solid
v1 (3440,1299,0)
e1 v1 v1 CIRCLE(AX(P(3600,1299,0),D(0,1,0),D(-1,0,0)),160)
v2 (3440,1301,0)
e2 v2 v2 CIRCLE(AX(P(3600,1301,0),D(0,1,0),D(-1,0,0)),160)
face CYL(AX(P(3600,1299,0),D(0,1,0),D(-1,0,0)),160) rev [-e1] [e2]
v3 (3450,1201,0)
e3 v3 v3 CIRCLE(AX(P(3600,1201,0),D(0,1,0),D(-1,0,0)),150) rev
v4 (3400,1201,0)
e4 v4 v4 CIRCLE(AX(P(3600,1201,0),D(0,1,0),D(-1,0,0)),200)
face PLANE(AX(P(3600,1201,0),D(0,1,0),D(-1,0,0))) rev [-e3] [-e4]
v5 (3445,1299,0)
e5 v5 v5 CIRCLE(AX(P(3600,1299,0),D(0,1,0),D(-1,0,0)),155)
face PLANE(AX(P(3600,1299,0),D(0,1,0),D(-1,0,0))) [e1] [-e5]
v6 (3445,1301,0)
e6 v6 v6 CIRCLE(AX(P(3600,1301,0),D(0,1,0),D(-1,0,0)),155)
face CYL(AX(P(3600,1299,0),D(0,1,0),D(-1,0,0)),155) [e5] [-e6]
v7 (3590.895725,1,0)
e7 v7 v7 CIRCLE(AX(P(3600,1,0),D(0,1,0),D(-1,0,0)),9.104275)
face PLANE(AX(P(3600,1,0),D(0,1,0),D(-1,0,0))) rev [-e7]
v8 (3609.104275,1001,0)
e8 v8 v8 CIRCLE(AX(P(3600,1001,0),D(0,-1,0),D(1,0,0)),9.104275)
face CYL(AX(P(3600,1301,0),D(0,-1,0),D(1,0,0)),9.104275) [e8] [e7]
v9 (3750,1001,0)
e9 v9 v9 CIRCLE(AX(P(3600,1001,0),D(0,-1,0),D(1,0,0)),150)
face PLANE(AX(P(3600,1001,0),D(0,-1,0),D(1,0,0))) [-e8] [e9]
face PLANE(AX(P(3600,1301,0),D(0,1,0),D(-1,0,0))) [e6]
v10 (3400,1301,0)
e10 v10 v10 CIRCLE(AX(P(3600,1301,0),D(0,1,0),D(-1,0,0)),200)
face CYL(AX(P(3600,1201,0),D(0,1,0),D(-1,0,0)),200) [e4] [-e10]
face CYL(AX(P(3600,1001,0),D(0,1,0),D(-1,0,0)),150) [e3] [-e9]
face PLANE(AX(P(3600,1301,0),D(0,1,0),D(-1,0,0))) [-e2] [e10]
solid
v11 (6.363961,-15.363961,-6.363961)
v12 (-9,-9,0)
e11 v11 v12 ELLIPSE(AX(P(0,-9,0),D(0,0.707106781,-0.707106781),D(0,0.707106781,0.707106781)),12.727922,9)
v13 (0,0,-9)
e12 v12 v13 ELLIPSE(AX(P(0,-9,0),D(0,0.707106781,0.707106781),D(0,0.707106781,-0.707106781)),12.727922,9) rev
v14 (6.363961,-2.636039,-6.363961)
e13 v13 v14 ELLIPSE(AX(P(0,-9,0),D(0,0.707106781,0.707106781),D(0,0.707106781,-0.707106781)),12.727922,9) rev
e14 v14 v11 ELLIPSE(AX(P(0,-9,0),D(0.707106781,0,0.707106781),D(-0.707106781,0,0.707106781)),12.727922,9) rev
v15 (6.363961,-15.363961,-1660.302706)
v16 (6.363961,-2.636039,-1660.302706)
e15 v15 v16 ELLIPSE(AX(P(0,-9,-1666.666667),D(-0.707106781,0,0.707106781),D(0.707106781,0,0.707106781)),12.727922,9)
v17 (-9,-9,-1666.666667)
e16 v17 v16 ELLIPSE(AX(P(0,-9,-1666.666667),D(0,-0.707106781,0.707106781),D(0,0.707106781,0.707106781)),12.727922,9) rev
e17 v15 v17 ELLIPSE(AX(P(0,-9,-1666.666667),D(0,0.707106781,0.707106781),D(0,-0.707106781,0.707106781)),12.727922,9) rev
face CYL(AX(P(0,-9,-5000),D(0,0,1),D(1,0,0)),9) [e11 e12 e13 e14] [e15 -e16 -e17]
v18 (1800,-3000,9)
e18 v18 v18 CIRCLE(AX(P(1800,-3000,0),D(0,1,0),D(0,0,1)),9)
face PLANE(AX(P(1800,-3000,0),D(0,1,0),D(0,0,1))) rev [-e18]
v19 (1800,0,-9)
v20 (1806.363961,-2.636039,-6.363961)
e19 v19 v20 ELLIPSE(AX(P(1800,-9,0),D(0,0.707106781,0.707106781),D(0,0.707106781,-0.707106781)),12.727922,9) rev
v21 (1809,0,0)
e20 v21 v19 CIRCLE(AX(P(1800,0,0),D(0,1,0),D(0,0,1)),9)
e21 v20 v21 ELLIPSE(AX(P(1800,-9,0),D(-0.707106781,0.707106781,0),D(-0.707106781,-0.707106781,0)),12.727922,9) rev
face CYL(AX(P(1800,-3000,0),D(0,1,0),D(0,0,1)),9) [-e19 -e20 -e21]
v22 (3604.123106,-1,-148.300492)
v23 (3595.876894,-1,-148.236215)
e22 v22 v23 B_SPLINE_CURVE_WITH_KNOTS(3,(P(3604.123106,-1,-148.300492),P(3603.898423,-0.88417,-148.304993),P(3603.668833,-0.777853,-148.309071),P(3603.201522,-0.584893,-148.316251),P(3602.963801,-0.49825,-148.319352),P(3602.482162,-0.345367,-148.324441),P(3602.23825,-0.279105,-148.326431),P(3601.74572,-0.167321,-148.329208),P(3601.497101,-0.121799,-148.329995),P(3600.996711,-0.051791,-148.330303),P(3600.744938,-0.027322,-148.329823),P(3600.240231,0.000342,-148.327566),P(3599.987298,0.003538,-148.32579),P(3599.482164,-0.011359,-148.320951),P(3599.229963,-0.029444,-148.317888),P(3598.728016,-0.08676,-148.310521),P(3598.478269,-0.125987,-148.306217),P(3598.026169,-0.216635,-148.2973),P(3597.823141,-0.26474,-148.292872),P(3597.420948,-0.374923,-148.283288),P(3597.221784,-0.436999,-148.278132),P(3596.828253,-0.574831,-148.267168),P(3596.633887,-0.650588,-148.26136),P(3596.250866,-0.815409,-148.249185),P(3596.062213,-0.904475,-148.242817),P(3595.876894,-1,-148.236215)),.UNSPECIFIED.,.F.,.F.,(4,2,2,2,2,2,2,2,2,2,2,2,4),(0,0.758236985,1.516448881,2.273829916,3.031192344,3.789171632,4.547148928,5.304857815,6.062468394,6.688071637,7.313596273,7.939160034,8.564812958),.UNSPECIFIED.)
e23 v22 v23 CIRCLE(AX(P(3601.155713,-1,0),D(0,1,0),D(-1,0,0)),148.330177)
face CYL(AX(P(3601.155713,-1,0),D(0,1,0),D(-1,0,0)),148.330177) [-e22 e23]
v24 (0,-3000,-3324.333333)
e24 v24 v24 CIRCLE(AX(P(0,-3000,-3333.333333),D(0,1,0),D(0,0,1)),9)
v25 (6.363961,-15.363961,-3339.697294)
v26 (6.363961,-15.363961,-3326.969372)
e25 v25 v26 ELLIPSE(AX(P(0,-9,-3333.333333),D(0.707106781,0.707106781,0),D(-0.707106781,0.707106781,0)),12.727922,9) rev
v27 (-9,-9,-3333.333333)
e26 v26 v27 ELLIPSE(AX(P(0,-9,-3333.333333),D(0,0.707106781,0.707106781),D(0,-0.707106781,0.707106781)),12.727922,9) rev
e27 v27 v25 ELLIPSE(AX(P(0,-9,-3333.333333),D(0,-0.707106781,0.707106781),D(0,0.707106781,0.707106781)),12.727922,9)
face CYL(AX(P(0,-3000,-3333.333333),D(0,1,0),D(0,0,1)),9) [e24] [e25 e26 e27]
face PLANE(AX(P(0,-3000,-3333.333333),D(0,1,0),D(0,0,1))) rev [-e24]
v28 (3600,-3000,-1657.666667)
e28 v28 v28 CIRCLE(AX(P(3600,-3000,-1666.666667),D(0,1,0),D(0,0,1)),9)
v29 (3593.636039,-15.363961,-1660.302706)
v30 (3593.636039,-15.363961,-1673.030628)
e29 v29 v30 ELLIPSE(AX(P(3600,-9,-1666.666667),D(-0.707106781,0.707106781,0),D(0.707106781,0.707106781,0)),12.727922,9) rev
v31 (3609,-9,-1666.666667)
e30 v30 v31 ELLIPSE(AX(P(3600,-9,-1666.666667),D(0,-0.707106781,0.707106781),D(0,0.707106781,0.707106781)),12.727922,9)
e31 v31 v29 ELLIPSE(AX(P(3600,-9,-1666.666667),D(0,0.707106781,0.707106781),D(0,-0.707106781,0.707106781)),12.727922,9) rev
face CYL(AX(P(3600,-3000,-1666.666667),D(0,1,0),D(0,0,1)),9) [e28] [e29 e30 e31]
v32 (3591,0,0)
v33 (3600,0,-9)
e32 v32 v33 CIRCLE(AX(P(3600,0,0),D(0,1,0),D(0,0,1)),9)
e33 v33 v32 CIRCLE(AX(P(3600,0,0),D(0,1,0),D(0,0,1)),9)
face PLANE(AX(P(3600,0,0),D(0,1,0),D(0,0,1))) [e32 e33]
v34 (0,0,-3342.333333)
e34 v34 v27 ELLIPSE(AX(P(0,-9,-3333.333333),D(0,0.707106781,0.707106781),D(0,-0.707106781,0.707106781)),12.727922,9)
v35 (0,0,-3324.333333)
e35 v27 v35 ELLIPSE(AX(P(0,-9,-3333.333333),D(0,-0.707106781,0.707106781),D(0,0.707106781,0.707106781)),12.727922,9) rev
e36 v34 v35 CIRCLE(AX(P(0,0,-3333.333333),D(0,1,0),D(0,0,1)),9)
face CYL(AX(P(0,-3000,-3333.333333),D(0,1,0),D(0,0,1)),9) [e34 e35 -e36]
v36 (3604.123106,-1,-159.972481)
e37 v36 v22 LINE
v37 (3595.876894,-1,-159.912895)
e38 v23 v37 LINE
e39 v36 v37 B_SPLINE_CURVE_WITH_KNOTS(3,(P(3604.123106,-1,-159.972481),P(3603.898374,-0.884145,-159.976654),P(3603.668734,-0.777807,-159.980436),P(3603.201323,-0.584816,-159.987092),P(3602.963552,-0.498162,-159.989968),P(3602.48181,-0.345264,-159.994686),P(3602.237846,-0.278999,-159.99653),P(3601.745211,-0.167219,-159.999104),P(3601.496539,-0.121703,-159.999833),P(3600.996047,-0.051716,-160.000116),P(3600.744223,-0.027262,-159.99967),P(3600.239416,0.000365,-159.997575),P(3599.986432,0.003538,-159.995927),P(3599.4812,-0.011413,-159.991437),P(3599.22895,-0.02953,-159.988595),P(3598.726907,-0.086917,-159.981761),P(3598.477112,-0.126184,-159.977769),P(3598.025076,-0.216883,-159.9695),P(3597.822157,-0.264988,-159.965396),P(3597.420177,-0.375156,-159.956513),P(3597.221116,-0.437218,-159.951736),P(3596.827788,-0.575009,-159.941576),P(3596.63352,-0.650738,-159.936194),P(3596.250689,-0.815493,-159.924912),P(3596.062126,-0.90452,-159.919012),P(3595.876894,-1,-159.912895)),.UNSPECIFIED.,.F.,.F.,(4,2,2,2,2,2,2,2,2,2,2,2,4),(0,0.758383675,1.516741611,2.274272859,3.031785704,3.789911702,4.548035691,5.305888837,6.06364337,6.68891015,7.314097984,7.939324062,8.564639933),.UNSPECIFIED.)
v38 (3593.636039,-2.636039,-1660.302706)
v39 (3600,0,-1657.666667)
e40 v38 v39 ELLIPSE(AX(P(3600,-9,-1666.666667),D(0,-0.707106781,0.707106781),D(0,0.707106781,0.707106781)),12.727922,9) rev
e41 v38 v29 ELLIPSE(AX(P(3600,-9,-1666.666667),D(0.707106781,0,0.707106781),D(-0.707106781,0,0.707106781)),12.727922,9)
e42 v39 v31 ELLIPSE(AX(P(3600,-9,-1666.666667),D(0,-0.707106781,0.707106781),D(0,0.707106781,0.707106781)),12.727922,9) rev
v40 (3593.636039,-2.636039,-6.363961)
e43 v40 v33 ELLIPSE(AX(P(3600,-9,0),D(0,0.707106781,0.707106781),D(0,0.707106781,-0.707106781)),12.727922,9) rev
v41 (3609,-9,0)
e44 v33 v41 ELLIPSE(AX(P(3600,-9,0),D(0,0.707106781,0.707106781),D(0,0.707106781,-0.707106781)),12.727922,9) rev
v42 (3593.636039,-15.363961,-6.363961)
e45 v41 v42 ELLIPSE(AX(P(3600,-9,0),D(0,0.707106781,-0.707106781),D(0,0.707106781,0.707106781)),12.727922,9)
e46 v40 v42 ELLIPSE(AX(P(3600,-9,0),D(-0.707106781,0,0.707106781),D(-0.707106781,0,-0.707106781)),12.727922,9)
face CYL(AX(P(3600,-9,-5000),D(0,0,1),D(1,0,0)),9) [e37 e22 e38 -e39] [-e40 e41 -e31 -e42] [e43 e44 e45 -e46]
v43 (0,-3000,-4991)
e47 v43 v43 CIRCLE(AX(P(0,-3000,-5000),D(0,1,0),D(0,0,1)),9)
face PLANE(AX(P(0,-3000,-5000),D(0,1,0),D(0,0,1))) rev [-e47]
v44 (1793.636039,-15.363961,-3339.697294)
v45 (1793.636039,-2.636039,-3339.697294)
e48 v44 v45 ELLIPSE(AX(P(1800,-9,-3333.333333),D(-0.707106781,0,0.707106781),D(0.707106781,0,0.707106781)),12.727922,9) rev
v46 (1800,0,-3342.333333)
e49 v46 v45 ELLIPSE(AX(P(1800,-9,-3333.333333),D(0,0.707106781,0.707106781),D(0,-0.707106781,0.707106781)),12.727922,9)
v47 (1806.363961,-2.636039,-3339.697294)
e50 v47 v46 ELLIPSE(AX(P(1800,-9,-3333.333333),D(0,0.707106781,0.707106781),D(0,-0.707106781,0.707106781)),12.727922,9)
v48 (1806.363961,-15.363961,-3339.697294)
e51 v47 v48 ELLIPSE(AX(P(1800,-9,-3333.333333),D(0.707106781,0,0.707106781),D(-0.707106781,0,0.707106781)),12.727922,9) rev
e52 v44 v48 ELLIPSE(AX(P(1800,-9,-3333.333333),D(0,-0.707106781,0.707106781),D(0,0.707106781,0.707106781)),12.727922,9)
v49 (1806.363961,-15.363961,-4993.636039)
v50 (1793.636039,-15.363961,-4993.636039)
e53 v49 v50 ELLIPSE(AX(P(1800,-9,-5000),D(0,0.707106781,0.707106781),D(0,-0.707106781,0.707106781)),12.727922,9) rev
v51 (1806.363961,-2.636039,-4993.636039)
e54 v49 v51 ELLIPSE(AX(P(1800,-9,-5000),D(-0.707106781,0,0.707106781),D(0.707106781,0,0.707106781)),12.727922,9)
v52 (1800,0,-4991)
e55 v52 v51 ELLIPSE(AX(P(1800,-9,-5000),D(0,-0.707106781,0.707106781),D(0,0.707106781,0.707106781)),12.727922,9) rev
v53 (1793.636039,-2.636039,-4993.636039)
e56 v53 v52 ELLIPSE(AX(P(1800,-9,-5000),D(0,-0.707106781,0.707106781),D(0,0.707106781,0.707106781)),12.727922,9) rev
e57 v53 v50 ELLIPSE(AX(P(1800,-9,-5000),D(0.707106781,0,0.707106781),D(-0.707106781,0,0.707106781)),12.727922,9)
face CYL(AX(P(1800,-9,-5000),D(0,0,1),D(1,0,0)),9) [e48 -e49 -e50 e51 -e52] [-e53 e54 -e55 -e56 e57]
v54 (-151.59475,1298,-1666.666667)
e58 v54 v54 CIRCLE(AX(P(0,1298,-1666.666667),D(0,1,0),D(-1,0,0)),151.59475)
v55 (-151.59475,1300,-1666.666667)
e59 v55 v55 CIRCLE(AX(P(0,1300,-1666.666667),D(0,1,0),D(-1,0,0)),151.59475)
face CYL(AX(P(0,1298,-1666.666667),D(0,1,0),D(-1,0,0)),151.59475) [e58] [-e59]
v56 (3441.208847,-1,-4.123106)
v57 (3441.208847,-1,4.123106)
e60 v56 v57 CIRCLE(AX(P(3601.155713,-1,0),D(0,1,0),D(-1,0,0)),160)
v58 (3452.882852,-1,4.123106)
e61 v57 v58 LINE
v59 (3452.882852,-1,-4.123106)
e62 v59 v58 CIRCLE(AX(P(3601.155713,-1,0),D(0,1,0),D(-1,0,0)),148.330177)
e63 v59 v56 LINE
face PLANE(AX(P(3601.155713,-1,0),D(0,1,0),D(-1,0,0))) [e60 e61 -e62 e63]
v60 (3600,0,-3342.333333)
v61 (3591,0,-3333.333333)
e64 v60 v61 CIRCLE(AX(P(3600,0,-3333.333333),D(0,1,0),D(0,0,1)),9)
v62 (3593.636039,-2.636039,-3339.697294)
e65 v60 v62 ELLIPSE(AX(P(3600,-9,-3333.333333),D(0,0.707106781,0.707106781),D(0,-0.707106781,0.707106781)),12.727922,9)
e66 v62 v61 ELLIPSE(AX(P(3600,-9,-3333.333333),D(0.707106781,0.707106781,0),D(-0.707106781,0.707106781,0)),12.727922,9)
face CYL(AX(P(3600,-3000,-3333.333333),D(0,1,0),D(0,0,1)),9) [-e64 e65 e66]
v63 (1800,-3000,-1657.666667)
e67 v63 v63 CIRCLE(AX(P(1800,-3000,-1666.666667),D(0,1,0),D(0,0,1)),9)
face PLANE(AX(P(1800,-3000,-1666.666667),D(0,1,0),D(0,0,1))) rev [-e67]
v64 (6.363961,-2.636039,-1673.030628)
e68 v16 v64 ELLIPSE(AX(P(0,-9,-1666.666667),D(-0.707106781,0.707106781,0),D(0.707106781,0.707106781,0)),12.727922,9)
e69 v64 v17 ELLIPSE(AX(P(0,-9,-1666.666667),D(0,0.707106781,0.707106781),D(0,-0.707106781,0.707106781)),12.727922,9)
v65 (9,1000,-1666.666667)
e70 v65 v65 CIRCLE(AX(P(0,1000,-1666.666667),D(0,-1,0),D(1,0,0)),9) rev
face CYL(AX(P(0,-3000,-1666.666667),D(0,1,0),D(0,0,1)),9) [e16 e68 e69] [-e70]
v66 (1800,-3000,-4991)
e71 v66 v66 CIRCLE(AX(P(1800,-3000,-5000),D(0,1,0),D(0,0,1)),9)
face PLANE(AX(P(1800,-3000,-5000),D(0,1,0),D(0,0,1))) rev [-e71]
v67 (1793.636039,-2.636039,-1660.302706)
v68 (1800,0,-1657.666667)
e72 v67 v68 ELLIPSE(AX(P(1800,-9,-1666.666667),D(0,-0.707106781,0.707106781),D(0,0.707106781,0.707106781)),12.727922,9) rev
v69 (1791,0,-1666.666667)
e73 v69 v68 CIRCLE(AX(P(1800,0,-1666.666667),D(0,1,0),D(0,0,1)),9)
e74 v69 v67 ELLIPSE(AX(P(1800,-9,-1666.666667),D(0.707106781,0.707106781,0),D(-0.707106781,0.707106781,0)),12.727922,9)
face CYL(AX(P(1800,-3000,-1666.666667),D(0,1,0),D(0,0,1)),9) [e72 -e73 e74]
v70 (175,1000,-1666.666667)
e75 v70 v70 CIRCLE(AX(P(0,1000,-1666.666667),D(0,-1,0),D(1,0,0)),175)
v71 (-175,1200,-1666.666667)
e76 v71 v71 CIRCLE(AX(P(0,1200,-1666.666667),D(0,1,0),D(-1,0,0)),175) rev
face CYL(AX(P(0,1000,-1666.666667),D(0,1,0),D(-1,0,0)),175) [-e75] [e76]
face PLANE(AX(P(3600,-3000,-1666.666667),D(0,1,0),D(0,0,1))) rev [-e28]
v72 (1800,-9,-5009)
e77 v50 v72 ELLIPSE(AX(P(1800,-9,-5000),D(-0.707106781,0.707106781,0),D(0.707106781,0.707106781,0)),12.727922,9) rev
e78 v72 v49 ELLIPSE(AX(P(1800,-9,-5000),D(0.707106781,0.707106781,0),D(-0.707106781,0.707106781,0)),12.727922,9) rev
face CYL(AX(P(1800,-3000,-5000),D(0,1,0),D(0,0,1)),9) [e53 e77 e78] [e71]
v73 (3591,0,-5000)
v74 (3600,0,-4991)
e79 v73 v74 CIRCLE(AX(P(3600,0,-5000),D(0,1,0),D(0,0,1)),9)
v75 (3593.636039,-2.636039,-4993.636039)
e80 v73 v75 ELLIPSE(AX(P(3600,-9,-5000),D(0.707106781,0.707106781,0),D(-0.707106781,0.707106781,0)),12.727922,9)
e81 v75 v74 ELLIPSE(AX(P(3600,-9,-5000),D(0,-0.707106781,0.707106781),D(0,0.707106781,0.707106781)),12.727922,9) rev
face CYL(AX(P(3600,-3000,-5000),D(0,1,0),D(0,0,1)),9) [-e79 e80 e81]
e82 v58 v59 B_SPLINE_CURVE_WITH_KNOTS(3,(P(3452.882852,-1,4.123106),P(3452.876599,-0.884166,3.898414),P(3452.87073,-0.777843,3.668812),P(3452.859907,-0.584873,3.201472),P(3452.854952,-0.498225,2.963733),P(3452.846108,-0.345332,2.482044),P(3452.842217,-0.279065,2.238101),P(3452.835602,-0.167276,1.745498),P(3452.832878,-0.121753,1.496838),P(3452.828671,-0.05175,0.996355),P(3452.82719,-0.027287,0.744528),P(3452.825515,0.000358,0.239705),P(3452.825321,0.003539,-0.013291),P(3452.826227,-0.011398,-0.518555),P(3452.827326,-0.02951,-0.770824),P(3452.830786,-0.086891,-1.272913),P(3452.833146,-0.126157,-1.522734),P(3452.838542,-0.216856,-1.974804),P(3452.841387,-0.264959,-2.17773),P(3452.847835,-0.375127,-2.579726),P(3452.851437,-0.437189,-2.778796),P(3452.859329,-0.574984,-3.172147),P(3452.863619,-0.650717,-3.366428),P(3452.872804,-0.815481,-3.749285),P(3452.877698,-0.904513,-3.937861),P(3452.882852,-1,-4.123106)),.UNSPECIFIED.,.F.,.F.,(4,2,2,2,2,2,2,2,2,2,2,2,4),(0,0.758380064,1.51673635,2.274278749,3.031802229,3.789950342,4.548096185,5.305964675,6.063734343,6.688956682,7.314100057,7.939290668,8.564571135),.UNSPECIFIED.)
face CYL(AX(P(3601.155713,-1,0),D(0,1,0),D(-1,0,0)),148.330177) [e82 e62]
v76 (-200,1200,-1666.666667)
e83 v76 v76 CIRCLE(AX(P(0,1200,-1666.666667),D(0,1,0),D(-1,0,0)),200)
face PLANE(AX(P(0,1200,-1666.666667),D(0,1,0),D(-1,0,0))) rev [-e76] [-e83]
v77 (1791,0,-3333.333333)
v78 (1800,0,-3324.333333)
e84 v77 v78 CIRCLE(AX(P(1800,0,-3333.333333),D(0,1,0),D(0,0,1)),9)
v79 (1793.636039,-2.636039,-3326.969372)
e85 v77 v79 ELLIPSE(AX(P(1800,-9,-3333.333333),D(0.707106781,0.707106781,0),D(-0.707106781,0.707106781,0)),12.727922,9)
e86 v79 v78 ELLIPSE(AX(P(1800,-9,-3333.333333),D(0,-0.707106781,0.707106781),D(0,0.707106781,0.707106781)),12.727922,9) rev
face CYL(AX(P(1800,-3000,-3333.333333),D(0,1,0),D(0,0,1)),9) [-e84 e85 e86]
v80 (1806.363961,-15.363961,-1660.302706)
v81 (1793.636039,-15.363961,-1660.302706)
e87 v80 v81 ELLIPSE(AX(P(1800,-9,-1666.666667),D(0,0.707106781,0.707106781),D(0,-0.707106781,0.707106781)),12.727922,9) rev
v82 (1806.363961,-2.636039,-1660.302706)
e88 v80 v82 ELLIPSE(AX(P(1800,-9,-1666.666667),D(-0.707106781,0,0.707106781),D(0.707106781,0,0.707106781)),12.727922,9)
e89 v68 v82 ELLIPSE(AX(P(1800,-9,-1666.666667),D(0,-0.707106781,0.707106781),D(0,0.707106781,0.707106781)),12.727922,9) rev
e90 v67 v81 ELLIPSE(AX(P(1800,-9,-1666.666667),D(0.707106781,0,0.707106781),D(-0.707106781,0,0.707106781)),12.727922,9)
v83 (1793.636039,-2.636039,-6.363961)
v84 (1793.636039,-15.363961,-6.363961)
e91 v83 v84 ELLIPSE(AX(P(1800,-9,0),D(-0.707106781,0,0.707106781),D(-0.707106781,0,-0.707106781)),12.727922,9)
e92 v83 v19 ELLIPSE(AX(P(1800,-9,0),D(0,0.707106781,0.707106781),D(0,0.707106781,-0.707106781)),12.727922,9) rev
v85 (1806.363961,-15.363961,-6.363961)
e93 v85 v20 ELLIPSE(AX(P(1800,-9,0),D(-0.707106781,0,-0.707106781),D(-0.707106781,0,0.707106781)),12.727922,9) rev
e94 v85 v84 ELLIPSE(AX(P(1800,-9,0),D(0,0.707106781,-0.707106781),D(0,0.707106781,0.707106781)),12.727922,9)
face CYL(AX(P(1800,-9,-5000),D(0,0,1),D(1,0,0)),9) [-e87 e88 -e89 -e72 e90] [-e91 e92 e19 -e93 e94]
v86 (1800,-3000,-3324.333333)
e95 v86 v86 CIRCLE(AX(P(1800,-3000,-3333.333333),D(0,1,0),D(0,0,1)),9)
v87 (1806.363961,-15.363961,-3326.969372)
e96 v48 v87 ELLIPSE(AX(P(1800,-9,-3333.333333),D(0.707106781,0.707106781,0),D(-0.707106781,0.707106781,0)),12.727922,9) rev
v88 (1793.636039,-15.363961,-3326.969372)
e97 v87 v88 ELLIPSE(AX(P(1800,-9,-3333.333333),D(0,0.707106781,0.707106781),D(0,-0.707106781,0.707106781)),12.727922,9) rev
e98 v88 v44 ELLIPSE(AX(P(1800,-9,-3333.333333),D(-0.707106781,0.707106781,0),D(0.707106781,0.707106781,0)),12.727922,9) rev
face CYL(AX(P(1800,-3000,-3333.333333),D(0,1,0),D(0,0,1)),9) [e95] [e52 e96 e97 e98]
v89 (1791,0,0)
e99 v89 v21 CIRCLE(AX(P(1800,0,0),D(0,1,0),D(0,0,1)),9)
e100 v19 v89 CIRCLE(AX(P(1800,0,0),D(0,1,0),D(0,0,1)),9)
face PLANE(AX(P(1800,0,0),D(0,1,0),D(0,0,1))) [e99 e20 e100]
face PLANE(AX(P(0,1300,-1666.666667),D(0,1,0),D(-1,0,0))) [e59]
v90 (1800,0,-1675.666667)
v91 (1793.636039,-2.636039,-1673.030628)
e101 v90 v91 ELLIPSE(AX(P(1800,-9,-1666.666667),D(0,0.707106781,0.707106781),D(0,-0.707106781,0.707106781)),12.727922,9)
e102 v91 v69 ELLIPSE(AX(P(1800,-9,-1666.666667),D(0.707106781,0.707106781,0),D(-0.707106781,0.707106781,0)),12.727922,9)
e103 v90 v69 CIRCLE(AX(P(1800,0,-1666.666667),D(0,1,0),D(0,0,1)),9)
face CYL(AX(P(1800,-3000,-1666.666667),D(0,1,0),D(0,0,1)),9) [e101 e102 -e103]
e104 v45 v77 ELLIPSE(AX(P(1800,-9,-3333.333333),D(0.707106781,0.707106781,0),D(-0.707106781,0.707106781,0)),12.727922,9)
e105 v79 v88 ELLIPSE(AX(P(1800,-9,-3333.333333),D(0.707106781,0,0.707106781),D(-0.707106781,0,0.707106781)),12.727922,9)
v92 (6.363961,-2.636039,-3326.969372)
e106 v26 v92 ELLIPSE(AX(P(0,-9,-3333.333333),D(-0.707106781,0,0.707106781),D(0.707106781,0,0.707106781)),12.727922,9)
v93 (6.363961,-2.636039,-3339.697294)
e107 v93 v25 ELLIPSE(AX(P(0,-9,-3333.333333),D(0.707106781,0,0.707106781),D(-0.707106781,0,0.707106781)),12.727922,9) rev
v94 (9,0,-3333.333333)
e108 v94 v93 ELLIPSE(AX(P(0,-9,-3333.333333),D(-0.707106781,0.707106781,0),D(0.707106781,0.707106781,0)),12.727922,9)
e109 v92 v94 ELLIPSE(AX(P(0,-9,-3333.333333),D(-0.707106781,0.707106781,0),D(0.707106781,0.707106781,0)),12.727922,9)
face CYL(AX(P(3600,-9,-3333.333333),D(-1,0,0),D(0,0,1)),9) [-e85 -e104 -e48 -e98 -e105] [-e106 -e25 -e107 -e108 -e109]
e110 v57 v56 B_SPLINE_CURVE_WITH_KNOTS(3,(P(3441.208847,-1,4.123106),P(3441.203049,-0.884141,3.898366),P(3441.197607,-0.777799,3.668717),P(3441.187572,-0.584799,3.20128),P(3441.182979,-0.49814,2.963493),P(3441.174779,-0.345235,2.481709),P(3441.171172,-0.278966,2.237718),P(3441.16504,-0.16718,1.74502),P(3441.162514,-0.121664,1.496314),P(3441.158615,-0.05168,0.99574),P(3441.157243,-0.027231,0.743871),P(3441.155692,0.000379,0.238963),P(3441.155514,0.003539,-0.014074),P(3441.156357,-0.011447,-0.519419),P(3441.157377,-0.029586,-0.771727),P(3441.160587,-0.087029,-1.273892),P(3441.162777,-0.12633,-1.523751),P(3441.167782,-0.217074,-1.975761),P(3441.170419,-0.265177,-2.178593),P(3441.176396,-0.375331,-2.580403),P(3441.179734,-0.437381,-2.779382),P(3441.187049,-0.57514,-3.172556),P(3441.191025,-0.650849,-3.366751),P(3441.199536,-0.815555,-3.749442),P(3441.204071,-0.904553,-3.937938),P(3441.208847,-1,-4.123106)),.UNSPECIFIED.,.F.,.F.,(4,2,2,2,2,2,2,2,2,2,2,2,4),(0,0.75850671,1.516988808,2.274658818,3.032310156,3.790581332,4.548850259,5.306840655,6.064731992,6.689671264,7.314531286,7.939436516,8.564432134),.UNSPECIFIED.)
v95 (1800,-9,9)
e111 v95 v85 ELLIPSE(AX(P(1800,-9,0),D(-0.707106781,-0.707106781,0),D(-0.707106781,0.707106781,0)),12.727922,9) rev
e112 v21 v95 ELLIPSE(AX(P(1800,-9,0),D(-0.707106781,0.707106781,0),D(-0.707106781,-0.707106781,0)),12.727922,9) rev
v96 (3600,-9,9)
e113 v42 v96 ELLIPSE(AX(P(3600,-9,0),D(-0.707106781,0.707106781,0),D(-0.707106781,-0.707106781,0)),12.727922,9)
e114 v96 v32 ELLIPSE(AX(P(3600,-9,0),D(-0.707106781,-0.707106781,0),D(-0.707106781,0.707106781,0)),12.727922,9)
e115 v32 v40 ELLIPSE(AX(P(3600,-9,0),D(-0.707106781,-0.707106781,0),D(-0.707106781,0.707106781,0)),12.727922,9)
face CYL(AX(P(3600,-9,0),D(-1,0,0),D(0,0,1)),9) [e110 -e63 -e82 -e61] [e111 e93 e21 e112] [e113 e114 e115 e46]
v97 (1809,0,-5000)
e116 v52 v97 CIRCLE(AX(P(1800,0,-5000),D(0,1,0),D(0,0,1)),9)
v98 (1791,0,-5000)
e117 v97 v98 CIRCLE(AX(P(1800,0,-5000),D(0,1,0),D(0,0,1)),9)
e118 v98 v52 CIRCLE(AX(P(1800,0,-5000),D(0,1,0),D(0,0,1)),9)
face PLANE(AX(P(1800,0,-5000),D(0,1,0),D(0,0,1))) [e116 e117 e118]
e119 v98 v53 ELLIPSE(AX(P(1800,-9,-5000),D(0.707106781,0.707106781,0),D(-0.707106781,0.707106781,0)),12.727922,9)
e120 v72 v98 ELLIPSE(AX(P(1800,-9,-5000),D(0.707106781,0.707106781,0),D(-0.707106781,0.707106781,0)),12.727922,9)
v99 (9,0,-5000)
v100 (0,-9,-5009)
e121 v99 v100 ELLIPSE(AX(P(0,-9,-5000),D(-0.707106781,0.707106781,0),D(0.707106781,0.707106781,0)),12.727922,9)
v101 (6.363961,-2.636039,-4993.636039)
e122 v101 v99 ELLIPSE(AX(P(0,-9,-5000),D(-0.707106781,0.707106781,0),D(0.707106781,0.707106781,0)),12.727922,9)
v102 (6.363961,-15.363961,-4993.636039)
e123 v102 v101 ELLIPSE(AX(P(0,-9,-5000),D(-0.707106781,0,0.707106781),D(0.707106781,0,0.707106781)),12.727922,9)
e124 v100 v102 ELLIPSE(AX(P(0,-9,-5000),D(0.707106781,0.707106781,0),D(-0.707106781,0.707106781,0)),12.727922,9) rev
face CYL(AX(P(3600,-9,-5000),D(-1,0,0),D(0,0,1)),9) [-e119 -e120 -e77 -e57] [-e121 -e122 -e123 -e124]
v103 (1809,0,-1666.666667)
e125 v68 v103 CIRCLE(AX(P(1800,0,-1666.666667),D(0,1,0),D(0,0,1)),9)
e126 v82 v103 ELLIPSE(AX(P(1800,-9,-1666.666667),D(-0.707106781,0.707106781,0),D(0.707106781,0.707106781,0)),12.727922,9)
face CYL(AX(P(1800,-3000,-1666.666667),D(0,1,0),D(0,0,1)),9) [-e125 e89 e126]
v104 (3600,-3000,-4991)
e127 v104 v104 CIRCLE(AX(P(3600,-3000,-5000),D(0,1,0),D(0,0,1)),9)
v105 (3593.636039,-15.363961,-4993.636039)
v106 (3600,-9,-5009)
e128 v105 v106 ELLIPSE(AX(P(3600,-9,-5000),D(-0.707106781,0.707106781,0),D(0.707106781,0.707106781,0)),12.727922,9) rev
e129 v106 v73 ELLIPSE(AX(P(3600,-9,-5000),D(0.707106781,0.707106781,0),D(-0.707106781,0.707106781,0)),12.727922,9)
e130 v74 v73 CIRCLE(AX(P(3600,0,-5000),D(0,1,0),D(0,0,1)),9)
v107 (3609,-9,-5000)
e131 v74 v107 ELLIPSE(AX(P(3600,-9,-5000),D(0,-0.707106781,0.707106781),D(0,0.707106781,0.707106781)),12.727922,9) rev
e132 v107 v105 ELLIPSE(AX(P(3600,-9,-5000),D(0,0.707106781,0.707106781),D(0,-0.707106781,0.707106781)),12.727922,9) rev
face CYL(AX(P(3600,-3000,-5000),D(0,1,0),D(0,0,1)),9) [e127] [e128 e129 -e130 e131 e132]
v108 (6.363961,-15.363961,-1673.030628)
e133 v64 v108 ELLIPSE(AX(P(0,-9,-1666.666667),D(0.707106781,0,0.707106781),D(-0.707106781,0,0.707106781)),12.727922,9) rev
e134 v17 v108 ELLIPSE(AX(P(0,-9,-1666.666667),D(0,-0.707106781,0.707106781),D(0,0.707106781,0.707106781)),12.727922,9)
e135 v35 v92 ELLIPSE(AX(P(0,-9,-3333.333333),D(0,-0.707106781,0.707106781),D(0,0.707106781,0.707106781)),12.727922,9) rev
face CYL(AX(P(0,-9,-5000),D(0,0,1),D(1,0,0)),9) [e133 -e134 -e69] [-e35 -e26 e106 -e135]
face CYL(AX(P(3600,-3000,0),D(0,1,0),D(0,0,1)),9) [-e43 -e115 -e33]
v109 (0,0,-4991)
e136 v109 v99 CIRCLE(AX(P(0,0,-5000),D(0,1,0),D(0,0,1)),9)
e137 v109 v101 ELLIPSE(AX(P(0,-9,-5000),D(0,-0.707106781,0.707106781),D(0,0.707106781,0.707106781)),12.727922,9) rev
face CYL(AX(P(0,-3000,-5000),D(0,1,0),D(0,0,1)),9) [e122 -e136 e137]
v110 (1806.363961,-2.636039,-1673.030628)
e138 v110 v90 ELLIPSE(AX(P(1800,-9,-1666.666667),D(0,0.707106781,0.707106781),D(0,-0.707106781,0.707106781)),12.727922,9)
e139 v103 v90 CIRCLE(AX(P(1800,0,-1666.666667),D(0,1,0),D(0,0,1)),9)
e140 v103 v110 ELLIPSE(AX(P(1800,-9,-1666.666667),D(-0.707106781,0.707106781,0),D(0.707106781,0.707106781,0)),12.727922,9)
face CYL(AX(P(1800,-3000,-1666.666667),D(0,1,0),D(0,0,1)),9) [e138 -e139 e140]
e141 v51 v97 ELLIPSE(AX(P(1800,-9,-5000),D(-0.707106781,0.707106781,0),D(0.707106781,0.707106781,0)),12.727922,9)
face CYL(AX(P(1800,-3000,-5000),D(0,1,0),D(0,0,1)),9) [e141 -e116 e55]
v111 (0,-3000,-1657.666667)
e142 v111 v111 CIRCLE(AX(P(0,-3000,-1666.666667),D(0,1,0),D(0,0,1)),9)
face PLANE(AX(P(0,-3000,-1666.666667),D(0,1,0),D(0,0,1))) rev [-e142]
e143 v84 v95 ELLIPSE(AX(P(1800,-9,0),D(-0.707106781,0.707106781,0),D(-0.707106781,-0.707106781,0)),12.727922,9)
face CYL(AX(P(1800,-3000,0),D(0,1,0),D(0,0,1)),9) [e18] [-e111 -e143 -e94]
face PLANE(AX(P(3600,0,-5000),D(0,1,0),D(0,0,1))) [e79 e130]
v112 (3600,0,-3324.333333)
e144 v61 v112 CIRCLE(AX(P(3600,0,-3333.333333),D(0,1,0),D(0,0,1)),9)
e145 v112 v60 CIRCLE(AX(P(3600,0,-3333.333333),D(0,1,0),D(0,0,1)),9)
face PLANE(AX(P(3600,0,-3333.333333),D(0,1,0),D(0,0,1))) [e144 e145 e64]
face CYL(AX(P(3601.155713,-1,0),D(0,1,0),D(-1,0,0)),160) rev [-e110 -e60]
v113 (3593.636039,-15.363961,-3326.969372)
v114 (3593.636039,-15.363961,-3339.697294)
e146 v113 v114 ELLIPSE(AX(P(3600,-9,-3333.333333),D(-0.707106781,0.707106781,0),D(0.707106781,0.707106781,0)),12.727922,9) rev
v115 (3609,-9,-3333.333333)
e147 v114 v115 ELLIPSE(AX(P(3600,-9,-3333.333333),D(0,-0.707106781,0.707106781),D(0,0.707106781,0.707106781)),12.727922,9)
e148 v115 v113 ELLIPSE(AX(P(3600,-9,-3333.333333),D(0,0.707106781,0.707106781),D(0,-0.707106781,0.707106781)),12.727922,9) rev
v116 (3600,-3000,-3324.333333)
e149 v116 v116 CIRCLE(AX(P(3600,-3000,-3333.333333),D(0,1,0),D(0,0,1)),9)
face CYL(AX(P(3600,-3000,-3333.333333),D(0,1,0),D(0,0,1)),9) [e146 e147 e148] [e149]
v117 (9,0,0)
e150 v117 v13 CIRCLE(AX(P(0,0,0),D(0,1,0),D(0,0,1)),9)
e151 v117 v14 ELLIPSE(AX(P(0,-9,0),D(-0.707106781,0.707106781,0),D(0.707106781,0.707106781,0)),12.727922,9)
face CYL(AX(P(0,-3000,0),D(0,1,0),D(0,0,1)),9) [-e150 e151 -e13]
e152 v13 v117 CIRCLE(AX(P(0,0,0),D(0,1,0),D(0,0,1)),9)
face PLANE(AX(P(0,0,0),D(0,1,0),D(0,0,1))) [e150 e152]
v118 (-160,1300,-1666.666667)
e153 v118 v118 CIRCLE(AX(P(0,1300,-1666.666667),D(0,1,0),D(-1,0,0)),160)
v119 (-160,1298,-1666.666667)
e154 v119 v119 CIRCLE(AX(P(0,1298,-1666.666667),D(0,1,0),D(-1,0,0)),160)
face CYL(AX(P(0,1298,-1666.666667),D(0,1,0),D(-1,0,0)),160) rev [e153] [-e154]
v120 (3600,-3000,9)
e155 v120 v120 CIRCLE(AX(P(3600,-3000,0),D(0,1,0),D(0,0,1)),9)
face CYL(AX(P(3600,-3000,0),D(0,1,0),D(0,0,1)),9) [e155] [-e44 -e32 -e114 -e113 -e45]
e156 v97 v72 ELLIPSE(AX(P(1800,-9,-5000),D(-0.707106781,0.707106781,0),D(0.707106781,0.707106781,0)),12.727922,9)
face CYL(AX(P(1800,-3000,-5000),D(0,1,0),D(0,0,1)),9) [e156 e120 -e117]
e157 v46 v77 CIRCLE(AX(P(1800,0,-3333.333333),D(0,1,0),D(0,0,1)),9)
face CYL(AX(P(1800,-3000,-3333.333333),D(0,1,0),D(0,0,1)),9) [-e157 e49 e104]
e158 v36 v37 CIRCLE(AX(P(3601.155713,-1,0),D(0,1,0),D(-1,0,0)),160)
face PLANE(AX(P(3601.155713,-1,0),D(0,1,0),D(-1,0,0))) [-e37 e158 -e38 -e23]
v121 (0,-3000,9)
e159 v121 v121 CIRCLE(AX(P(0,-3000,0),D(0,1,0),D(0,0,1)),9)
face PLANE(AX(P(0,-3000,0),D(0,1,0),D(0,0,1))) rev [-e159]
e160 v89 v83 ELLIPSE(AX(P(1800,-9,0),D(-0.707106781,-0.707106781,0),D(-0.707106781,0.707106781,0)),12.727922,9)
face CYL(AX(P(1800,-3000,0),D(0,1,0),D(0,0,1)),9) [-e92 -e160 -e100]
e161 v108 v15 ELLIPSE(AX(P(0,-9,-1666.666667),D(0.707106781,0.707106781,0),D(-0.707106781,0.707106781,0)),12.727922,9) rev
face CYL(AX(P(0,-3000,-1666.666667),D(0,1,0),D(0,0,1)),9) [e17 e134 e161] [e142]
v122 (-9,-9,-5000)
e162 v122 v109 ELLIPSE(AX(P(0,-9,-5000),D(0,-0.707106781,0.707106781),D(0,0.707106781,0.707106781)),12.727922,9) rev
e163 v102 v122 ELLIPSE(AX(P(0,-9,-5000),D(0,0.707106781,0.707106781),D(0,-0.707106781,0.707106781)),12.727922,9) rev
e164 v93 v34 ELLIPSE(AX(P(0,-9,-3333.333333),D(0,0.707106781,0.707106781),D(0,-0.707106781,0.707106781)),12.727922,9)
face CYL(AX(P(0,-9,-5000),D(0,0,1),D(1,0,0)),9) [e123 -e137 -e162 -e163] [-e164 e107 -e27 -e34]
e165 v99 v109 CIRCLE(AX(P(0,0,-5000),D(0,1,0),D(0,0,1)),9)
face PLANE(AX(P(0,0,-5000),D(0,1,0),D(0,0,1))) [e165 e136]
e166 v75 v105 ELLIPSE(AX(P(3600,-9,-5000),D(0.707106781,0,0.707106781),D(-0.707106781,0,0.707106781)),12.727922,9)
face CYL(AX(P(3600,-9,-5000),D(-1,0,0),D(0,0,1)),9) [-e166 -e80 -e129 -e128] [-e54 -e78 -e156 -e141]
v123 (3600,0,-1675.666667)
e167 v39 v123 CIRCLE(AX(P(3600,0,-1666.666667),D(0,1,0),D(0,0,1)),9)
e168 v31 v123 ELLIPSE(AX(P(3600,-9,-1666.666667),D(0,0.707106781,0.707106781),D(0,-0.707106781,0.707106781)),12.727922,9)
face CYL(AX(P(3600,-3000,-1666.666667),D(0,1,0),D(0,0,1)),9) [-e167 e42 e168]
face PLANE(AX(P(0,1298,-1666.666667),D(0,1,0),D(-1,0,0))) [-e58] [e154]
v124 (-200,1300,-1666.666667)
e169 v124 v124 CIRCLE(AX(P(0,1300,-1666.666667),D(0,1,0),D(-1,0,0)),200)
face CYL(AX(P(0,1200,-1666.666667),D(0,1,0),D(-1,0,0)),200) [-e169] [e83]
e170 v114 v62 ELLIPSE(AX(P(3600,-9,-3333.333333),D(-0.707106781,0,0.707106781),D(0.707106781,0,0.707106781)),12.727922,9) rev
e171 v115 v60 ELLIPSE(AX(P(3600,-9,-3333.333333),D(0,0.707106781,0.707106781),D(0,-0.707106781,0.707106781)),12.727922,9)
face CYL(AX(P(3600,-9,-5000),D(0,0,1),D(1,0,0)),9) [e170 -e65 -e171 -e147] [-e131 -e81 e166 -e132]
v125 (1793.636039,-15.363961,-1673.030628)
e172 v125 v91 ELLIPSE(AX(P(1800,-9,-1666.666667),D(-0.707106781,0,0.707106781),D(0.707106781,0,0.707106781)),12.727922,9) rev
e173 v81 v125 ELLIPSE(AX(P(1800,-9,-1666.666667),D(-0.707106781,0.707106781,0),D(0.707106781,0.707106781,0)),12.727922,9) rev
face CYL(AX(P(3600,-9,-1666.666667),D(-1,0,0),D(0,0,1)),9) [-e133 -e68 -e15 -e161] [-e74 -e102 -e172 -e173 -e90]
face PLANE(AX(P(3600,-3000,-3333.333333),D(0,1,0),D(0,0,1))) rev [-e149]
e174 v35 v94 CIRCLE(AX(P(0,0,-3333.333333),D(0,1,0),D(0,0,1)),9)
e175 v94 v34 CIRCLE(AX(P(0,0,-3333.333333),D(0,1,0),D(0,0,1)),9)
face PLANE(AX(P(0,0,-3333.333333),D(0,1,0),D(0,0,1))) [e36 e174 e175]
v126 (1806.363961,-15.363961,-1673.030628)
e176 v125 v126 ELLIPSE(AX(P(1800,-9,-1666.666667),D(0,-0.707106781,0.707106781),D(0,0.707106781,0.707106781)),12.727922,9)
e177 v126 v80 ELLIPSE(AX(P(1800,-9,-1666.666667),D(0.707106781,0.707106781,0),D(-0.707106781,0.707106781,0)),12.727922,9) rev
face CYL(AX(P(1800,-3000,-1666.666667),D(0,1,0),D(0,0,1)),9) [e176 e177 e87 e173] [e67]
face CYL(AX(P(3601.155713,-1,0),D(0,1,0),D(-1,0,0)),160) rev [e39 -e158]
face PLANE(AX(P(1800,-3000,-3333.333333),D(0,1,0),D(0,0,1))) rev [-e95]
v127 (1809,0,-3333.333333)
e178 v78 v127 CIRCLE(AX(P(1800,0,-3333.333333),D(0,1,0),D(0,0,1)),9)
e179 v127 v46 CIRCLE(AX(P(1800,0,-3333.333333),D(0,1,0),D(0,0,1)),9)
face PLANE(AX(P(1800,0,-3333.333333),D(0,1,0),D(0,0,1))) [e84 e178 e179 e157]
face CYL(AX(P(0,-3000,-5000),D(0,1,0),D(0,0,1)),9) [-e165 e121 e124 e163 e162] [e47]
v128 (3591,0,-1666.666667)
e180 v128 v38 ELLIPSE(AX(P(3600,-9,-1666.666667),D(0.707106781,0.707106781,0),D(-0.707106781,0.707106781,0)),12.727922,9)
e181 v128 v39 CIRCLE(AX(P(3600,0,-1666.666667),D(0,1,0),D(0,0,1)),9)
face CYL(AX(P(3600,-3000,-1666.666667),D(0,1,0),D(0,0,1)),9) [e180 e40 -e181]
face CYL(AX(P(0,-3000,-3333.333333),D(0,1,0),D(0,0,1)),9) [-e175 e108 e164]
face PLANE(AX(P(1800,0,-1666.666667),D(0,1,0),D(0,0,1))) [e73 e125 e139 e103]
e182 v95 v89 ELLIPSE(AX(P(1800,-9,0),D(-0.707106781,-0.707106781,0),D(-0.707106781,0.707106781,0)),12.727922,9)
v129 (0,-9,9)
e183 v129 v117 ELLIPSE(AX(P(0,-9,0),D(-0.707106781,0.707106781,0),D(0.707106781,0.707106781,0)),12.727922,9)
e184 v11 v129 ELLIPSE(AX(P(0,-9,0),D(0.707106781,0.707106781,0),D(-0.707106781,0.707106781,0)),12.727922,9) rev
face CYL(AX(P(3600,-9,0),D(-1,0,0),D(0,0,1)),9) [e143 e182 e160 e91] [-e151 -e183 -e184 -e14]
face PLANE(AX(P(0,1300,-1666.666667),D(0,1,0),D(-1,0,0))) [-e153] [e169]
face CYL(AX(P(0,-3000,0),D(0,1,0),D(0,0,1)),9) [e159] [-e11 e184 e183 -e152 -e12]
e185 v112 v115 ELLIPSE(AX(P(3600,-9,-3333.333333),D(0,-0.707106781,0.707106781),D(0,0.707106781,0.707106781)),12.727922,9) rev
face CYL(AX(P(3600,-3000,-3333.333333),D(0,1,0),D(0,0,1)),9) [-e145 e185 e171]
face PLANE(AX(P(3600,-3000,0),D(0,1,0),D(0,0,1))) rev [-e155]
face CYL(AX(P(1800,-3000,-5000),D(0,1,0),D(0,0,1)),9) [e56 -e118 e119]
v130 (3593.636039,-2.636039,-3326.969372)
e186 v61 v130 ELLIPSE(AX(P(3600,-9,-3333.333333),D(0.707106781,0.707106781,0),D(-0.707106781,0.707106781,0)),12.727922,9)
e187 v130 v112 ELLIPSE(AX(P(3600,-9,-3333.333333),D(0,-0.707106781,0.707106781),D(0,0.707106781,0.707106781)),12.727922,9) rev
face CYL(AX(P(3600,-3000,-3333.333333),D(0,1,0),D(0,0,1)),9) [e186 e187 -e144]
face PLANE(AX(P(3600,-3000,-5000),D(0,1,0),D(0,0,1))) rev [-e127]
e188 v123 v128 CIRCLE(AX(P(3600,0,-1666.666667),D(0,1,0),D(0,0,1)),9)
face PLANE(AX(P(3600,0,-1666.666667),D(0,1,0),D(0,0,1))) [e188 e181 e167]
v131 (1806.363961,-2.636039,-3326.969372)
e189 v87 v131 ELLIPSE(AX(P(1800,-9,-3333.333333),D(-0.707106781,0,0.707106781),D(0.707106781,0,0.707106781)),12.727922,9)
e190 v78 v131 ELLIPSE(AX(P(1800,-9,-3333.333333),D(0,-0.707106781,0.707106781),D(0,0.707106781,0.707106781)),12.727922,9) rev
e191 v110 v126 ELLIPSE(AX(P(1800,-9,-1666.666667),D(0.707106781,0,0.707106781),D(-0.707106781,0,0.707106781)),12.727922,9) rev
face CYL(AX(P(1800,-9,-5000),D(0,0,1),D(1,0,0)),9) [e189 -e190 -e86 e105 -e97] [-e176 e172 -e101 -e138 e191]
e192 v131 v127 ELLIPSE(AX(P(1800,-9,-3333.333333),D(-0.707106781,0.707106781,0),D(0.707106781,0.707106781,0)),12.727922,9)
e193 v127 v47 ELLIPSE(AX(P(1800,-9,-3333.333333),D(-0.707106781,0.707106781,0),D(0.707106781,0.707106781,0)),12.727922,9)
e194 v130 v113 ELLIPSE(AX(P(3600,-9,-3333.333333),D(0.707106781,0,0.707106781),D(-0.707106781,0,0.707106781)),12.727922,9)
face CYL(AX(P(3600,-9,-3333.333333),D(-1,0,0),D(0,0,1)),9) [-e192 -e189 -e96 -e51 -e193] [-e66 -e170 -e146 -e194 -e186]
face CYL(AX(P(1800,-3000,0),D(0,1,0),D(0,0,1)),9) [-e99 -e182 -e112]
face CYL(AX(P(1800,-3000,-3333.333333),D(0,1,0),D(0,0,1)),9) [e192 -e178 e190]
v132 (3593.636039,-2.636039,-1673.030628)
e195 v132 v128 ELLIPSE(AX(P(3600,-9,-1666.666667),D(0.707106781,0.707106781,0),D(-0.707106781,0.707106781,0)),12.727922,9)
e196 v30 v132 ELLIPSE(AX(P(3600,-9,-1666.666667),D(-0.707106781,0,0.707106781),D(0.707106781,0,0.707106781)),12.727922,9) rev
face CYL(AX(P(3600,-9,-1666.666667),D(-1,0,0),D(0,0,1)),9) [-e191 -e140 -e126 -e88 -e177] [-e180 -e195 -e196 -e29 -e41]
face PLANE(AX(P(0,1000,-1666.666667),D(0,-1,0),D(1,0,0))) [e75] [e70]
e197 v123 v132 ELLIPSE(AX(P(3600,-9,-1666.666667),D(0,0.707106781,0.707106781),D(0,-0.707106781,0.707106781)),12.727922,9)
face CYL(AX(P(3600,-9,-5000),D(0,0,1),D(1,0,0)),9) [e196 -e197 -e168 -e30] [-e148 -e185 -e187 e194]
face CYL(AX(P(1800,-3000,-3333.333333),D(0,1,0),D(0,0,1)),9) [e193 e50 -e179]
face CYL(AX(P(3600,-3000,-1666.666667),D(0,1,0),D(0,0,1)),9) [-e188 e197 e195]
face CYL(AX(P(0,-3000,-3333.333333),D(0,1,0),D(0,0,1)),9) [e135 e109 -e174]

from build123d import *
from build123d.topology import SkipClean

# Parameters (mm, degrees)
CROQUIS1_R               = 9
SALIENTE_EXTRUIR1_DEPTH  = 3000
CROQUIS2_R               = 9
SALIENTE_EXTRUIR2_DEPTH  = 5000
MATRIZL2_COUNT           = 4
MATRIZL2_PITCH           = 1666.666666667
CROQUIS3_R               = 9
SALIENTE_EXTRUIR3_DEPTH  = 3600
MATRIZL4_COUNT           = 3
MATRIZL4_PITCH           = 1800
MATRIZL5_COUNT           = 3
MATRIZL5_PITCH           = 1800
MATRIZL6_COPY_1_SKETCH_R = 9
MATRIZL6_COPY_1_DEPTH    = 3000
MATRIZL6_COPY_2_SKETCH_R = 9
MATRIZL6_COPY_2_DEPTH    = 3000
MATRIZL6_COPY_3_SKETCH_R = 9
MATRIZL6_COPY_3_DEPTH    = 3000
MATRIZL6_COPY_4_SKETCH_R = 9
MATRIZL6_COPY_4_DEPTH    = 3000
MATRIZL6_COPY_5_SKETCH_R = 9
MATRIZL6_COPY_5_DEPTH    = 3000
MATRIZL6_COPY_6_SKETCH_R = 9
MATRIZL6_COPY_6_DEPTH    = 3000
MATRIZL6_COPY_7_SKETCH_R = 9
MATRIZL6_COPY_7_DEPTH    = 3000
MATRIZL6_COPY_8_SKETCH_R = 9
MATRIZL6_COPY_8_DEPTH    = 3000
MATRIZL6_COPY_9_SKETCH_R = 9
MATRIZL6_COPY_9_DEPTH    = 3000
MATRIZL7_COUNT           = 4
MATRIZL7_PITCH           = 1666.666666667
SALIENTE_EXTRUIR4_START  = 1300
CROQUIS4_R               = 9
SALIENTE_EXTRUIR4_DEPTH  = 1300
CROQUIS5_R               = 200
SALIENTE_EXTRUIR5_DEPTH  = 100
CROQUIS6_R               = 175
SALIENTE_EXTRUIR6_DEPTH  = 200
CROQUIS9_R               = 9.104274915
SALIENTE_EXTRUIR10_DEPTH = 1300
CROQUIS10_R              = 200
SALIENTE_EXTRUIR11_DEPTH = 100
CROQUIS11_R              = 160
CROQUIS11_R_2            = 151.594750353
CORTAR_EXTRUIR1_DEPTH    = 2
CROQUIS12_R              = 160
CROQUIS12_R_2            = 148.330176848
CORTAR_EXTRUIR2_DEPTH    = 2
CROQUIS13_R              = 160
CROQUIS13_R_2            = 155
CORTAR_EXTRUIR3_DEPTH    = 2
CROQUIS15_R              = 150
SALIENTE_EXTRUIR12_DEPTH = 200


with BuildPart() as part:
    # Croquis1 → Saliente-Extruir1 (new body)
    with BuildSketch(Plane(origin=(0, 0, 0), x_dir=(1, 0, 0), z_dir=(0, 1, 0))):
        Circle(CROQUIS1_R)
    saliente_extruir1 = extrude(amount=-SALIENTE_EXTRUIR1_DEPTH)

    # Croquis2 → Saliente-Extruir2 (add)
    with BuildSketch(Plane.XY):
        with Locations((0, -9)):
            Circle(CROQUIS2_R)
    saliente_extruir2 = extrude(amount=-SALIENTE_EXTRUIR2_DEPTH)

    # MatrizL2: Saliente-Extruir1 ×4
    with Locations(*[(0, 0, -i * MATRIZL2_PITCH) for i in range(1, MATRIZL2_COUNT)]):
        add(saliente_extruir1)

    # Croquis3 → Saliente-Extruir3 (add)
    with BuildSketch(Plane(origin=(0, 0, 0), x_dir=(0, 0, -1), z_dir=(1, 0, 0))):
        with Locations((0, -9)):
            Circle(CROQUIS3_R)
    saliente_extruir3 = extrude(amount=SALIENTE_EXTRUIR3_DEPTH)

    # MatrizL4: Saliente-Extruir1 ×3
    with Locations(*[(i * MATRIZL4_PITCH, 0, 0) for i in range(1, MATRIZL4_COUNT)]):
        add(saliente_extruir1)

    # MatrizL5: Saliente-Extruir2 ×3
    with SkipClean():  # the faces are left unmerged after this step: merging them gives an invalid solid
        with Locations(*[(i * MATRIZL5_PITCH, 0, 0) for i in range(1, MATRIZL5_COUNT)]):
            add(saliente_extruir2)

    # MatrizL6 copy 1 sketch → MatrizL6 copy 1 (add)
    with SkipClean():  # the faces are left unmerged after this step: merging them gives an invalid solid
        with BuildSketch(Plane(origin=(1800, 0, -1666.666666667), x_dir=(1, 0, 0), z_dir=(0, 1, 0))):
            Circle(MATRIZL6_COPY_1_SKETCH_R)
        extrude(amount=-MATRIZL6_COPY_1_DEPTH)

    # MatrizL6 copy 2 sketch → MatrizL6 copy 2 (add)
    with SkipClean():  # the faces are left unmerged after this step: merging them gives an invalid solid
        with BuildSketch(Plane(origin=(1800, 0, -3333.333333333), x_dir=(1, 0, 0), z_dir=(0, 1, 0))):
            Circle(MATRIZL6_COPY_2_SKETCH_R)
        extrude(amount=-MATRIZL6_COPY_2_DEPTH)

    # MatrizL6 copy 3 sketch → MatrizL6 copy 3 (add)
    with SkipClean():  # the faces are left unmerged after this step: merging them gives an invalid solid
        with BuildSketch(Plane(origin=(1800, 0, -5000), x_dir=(1, 0, 0), z_dir=(0, 1, 0))):
            Circle(MATRIZL6_COPY_3_SKETCH_R)
        extrude(amount=-MATRIZL6_COPY_3_DEPTH)

    # MatrizL6 copy 4 sketch → MatrizL6 copy 4 (add)
    with SkipClean():  # the faces are left unmerged after this step: merging them gives an invalid solid
        with BuildSketch(Plane(origin=(3600, 0, -1666.666666667), x_dir=(1, 0, 0), z_dir=(0, 1, 0))):
            Circle(MATRIZL6_COPY_4_SKETCH_R)
        extrude(amount=-MATRIZL6_COPY_4_DEPTH)

    # MatrizL6 copy 5 sketch → MatrizL6 copy 5 (add)
    with SkipClean():  # the faces are left unmerged after this step: merging them gives an invalid solid
        with BuildSketch(Plane(origin=(3600, 0, -3333.333333333), x_dir=(1, 0, 0), z_dir=(0, 1, 0))):
            Circle(MATRIZL6_COPY_5_SKETCH_R)
        extrude(amount=-MATRIZL6_COPY_5_DEPTH)

    # MatrizL6 copy 6 sketch → MatrizL6 copy 6 (add)
    with SkipClean():  # the faces are left unmerged after this step: merging them gives an invalid solid
        with BuildSketch(Plane(origin=(3600, 0, -5000), x_dir=(1, 0, 0), z_dir=(0, 1, 0))):
            Circle(MATRIZL6_COPY_6_SKETCH_R)
        extrude(amount=-MATRIZL6_COPY_6_DEPTH)

    # MatrizL6 copy 7 sketch → MatrizL6 copy 7 (add)
    with SkipClean():  # the faces are left unmerged after this step: merging them gives an invalid solid
        with BuildSketch(Plane(origin=(0, 0, -1666.666666667), x_dir=(1, 0, 0), z_dir=(0, 1, 0))):
            Circle(MATRIZL6_COPY_7_SKETCH_R)
        extrude(amount=-MATRIZL6_COPY_7_DEPTH)

    # MatrizL6 copy 8 sketch → MatrizL6 copy 8 (add)
    with SkipClean():  # the faces are left unmerged after this step: merging them gives an invalid solid
        with BuildSketch(Plane(origin=(0, 0, -3333.333333333), x_dir=(1, 0, 0), z_dir=(0, 1, 0))):
            Circle(MATRIZL6_COPY_8_SKETCH_R)
        extrude(amount=-MATRIZL6_COPY_8_DEPTH)

    # MatrizL6 copy 9 sketch → MatrizL6 copy 9 (add)
    with SkipClean():  # the faces are left unmerged after this step: merging them gives an invalid solid
        with BuildSketch(Plane(origin=(0, 0, -5000), x_dir=(1, 0, 0), z_dir=(0, 1, 0))):
            Circle(MATRIZL6_COPY_9_SKETCH_R)
        extrude(amount=-MATRIZL6_COPY_9_DEPTH)

    # MatrizL7: Saliente-Extruir3 ×4
    with SkipClean():  # the faces are left unmerged after this step: merging them gives an invalid solid
        with Locations(*[(0, 0, -i * MATRIZL7_PITCH) for i in range(1, MATRIZL7_COUNT)]):
            add(saliente_extruir3)

    # Croquis4 → Saliente-Extruir4 (add)
    with SkipClean():  # the faces are left unmerged after this step: merging them gives an invalid solid
        with BuildSketch(Plane(origin=(0, 0, 0), x_dir=(1, 0, 0), z_dir=(0, 1, 0)).offset(SALIENTE_EXTRUIR4_START)):
            with Locations((0, 1666.666666667)):
                Circle(CROQUIS4_R)
        extrude(amount=-SALIENTE_EXTRUIR4_DEPTH)

    # Croquis5 → Saliente-Extruir5 (add)
    with SkipClean():  # the faces are left unmerged after this step: merging them gives an invalid solid
        with BuildSketch(Plane(origin=(0, 1300, 0), x_dir=(1, 0, 0), z_dir=(0, 1, 0))):
            with Locations((0, 1666.666666667)):
                Circle(CROQUIS5_R)
        extrude(amount=-SALIENTE_EXTRUIR5_DEPTH)

    # Croquis6 → Saliente-Extruir6 (add)
    with SkipClean():  # the faces are left unmerged after this step: merging them gives an invalid solid
        with BuildSketch(Plane.XZ.offset(-1200)):
            with Locations((0, -1666.666666667)):
                Circle(CROQUIS6_R)
        extrude(amount=SALIENTE_EXTRUIR6_DEPTH)

    # Croquis11 → Cortar-Extruir1 (cut)
    with SkipClean():  # the faces are left unmerged after this step: merging them gives an invalid solid
        with BuildSketch(Plane(origin=(0, 1300, 0), x_dir=(1, 0, 0), z_dir=(0, 1, 0))):
            with Locations((0, 1666.666666667)):
                Circle(CROQUIS11_R)
            with Locations((0, 1666.666666667)):
                Circle(CROQUIS11_R_2, mode=Mode.SUBTRACT)
        extrude(amount=-CORTAR_EXTRUIR1_DEPTH, mode=Mode.SUBTRACT)

    # Croquis12 → Cortar-Extruir2 (cut)
    with SkipClean():  # the faces are left unmerged after this step: merging them gives an invalid solid
        with BuildSketch(Plane(origin=(0, 1, 0), x_dir=(1, 0, 0), z_dir=(0, 1, 0))):
            with Locations((3601.155712906, 0)):
                Circle(CROQUIS12_R)
            with Locations((3601.155712906, 0)):
                Circle(CROQUIS12_R_2, mode=Mode.SUBTRACT)
        extrude(amount=-CORTAR_EXTRUIR2_DEPTH, mode=Mode.SUBTRACT)


with BuildPart() as body_2:
    # Croquis9 → Saliente-Extruir10 (new body)
    with BuildSketch(Plane(origin=(0, 1, 0), x_dir=(1, 0, 0), z_dir=(0, 1, 0))):
        with Locations((3600, 0)):
            Circle(CROQUIS9_R)
    extrude(amount=SALIENTE_EXTRUIR10_DEPTH)

    # Croquis10 → Saliente-Extruir11 (add)
    with BuildSketch(Plane(origin=(0, 1301, 0), x_dir=(1, 0, 0), z_dir=(0, 1, 0))):
        with Locations((3600, 0)):
            Circle(CROQUIS10_R)
    extrude(amount=-SALIENTE_EXTRUIR11_DEPTH)

    # Croquis13 → Cortar-Extruir3 (cut)
    with BuildSketch(Plane(origin=(0, 1301, 0), x_dir=(1, 0, 0), z_dir=(0, 1, 0))):
        with Locations((3600, 0)):
            Circle(CROQUIS13_R)
        with Locations((3600, 0)):
            Circle(CROQUIS13_R_2, mode=Mode.SUBTRACT)
    extrude(amount=-CORTAR_EXTRUIR3_DEPTH, mode=Mode.SUBTRACT)

    # Croquis15 → Saliente-Extruir12 (add)
    with BuildSketch(Plane.XZ.offset(-1201)):
        with Locations((3600, 0)):
            Circle(CROQUIS15_R)
    extrude(amount=SALIENTE_EXTRUIR12_DEPTH)


solid = Compound([part.part, body_2.part])
